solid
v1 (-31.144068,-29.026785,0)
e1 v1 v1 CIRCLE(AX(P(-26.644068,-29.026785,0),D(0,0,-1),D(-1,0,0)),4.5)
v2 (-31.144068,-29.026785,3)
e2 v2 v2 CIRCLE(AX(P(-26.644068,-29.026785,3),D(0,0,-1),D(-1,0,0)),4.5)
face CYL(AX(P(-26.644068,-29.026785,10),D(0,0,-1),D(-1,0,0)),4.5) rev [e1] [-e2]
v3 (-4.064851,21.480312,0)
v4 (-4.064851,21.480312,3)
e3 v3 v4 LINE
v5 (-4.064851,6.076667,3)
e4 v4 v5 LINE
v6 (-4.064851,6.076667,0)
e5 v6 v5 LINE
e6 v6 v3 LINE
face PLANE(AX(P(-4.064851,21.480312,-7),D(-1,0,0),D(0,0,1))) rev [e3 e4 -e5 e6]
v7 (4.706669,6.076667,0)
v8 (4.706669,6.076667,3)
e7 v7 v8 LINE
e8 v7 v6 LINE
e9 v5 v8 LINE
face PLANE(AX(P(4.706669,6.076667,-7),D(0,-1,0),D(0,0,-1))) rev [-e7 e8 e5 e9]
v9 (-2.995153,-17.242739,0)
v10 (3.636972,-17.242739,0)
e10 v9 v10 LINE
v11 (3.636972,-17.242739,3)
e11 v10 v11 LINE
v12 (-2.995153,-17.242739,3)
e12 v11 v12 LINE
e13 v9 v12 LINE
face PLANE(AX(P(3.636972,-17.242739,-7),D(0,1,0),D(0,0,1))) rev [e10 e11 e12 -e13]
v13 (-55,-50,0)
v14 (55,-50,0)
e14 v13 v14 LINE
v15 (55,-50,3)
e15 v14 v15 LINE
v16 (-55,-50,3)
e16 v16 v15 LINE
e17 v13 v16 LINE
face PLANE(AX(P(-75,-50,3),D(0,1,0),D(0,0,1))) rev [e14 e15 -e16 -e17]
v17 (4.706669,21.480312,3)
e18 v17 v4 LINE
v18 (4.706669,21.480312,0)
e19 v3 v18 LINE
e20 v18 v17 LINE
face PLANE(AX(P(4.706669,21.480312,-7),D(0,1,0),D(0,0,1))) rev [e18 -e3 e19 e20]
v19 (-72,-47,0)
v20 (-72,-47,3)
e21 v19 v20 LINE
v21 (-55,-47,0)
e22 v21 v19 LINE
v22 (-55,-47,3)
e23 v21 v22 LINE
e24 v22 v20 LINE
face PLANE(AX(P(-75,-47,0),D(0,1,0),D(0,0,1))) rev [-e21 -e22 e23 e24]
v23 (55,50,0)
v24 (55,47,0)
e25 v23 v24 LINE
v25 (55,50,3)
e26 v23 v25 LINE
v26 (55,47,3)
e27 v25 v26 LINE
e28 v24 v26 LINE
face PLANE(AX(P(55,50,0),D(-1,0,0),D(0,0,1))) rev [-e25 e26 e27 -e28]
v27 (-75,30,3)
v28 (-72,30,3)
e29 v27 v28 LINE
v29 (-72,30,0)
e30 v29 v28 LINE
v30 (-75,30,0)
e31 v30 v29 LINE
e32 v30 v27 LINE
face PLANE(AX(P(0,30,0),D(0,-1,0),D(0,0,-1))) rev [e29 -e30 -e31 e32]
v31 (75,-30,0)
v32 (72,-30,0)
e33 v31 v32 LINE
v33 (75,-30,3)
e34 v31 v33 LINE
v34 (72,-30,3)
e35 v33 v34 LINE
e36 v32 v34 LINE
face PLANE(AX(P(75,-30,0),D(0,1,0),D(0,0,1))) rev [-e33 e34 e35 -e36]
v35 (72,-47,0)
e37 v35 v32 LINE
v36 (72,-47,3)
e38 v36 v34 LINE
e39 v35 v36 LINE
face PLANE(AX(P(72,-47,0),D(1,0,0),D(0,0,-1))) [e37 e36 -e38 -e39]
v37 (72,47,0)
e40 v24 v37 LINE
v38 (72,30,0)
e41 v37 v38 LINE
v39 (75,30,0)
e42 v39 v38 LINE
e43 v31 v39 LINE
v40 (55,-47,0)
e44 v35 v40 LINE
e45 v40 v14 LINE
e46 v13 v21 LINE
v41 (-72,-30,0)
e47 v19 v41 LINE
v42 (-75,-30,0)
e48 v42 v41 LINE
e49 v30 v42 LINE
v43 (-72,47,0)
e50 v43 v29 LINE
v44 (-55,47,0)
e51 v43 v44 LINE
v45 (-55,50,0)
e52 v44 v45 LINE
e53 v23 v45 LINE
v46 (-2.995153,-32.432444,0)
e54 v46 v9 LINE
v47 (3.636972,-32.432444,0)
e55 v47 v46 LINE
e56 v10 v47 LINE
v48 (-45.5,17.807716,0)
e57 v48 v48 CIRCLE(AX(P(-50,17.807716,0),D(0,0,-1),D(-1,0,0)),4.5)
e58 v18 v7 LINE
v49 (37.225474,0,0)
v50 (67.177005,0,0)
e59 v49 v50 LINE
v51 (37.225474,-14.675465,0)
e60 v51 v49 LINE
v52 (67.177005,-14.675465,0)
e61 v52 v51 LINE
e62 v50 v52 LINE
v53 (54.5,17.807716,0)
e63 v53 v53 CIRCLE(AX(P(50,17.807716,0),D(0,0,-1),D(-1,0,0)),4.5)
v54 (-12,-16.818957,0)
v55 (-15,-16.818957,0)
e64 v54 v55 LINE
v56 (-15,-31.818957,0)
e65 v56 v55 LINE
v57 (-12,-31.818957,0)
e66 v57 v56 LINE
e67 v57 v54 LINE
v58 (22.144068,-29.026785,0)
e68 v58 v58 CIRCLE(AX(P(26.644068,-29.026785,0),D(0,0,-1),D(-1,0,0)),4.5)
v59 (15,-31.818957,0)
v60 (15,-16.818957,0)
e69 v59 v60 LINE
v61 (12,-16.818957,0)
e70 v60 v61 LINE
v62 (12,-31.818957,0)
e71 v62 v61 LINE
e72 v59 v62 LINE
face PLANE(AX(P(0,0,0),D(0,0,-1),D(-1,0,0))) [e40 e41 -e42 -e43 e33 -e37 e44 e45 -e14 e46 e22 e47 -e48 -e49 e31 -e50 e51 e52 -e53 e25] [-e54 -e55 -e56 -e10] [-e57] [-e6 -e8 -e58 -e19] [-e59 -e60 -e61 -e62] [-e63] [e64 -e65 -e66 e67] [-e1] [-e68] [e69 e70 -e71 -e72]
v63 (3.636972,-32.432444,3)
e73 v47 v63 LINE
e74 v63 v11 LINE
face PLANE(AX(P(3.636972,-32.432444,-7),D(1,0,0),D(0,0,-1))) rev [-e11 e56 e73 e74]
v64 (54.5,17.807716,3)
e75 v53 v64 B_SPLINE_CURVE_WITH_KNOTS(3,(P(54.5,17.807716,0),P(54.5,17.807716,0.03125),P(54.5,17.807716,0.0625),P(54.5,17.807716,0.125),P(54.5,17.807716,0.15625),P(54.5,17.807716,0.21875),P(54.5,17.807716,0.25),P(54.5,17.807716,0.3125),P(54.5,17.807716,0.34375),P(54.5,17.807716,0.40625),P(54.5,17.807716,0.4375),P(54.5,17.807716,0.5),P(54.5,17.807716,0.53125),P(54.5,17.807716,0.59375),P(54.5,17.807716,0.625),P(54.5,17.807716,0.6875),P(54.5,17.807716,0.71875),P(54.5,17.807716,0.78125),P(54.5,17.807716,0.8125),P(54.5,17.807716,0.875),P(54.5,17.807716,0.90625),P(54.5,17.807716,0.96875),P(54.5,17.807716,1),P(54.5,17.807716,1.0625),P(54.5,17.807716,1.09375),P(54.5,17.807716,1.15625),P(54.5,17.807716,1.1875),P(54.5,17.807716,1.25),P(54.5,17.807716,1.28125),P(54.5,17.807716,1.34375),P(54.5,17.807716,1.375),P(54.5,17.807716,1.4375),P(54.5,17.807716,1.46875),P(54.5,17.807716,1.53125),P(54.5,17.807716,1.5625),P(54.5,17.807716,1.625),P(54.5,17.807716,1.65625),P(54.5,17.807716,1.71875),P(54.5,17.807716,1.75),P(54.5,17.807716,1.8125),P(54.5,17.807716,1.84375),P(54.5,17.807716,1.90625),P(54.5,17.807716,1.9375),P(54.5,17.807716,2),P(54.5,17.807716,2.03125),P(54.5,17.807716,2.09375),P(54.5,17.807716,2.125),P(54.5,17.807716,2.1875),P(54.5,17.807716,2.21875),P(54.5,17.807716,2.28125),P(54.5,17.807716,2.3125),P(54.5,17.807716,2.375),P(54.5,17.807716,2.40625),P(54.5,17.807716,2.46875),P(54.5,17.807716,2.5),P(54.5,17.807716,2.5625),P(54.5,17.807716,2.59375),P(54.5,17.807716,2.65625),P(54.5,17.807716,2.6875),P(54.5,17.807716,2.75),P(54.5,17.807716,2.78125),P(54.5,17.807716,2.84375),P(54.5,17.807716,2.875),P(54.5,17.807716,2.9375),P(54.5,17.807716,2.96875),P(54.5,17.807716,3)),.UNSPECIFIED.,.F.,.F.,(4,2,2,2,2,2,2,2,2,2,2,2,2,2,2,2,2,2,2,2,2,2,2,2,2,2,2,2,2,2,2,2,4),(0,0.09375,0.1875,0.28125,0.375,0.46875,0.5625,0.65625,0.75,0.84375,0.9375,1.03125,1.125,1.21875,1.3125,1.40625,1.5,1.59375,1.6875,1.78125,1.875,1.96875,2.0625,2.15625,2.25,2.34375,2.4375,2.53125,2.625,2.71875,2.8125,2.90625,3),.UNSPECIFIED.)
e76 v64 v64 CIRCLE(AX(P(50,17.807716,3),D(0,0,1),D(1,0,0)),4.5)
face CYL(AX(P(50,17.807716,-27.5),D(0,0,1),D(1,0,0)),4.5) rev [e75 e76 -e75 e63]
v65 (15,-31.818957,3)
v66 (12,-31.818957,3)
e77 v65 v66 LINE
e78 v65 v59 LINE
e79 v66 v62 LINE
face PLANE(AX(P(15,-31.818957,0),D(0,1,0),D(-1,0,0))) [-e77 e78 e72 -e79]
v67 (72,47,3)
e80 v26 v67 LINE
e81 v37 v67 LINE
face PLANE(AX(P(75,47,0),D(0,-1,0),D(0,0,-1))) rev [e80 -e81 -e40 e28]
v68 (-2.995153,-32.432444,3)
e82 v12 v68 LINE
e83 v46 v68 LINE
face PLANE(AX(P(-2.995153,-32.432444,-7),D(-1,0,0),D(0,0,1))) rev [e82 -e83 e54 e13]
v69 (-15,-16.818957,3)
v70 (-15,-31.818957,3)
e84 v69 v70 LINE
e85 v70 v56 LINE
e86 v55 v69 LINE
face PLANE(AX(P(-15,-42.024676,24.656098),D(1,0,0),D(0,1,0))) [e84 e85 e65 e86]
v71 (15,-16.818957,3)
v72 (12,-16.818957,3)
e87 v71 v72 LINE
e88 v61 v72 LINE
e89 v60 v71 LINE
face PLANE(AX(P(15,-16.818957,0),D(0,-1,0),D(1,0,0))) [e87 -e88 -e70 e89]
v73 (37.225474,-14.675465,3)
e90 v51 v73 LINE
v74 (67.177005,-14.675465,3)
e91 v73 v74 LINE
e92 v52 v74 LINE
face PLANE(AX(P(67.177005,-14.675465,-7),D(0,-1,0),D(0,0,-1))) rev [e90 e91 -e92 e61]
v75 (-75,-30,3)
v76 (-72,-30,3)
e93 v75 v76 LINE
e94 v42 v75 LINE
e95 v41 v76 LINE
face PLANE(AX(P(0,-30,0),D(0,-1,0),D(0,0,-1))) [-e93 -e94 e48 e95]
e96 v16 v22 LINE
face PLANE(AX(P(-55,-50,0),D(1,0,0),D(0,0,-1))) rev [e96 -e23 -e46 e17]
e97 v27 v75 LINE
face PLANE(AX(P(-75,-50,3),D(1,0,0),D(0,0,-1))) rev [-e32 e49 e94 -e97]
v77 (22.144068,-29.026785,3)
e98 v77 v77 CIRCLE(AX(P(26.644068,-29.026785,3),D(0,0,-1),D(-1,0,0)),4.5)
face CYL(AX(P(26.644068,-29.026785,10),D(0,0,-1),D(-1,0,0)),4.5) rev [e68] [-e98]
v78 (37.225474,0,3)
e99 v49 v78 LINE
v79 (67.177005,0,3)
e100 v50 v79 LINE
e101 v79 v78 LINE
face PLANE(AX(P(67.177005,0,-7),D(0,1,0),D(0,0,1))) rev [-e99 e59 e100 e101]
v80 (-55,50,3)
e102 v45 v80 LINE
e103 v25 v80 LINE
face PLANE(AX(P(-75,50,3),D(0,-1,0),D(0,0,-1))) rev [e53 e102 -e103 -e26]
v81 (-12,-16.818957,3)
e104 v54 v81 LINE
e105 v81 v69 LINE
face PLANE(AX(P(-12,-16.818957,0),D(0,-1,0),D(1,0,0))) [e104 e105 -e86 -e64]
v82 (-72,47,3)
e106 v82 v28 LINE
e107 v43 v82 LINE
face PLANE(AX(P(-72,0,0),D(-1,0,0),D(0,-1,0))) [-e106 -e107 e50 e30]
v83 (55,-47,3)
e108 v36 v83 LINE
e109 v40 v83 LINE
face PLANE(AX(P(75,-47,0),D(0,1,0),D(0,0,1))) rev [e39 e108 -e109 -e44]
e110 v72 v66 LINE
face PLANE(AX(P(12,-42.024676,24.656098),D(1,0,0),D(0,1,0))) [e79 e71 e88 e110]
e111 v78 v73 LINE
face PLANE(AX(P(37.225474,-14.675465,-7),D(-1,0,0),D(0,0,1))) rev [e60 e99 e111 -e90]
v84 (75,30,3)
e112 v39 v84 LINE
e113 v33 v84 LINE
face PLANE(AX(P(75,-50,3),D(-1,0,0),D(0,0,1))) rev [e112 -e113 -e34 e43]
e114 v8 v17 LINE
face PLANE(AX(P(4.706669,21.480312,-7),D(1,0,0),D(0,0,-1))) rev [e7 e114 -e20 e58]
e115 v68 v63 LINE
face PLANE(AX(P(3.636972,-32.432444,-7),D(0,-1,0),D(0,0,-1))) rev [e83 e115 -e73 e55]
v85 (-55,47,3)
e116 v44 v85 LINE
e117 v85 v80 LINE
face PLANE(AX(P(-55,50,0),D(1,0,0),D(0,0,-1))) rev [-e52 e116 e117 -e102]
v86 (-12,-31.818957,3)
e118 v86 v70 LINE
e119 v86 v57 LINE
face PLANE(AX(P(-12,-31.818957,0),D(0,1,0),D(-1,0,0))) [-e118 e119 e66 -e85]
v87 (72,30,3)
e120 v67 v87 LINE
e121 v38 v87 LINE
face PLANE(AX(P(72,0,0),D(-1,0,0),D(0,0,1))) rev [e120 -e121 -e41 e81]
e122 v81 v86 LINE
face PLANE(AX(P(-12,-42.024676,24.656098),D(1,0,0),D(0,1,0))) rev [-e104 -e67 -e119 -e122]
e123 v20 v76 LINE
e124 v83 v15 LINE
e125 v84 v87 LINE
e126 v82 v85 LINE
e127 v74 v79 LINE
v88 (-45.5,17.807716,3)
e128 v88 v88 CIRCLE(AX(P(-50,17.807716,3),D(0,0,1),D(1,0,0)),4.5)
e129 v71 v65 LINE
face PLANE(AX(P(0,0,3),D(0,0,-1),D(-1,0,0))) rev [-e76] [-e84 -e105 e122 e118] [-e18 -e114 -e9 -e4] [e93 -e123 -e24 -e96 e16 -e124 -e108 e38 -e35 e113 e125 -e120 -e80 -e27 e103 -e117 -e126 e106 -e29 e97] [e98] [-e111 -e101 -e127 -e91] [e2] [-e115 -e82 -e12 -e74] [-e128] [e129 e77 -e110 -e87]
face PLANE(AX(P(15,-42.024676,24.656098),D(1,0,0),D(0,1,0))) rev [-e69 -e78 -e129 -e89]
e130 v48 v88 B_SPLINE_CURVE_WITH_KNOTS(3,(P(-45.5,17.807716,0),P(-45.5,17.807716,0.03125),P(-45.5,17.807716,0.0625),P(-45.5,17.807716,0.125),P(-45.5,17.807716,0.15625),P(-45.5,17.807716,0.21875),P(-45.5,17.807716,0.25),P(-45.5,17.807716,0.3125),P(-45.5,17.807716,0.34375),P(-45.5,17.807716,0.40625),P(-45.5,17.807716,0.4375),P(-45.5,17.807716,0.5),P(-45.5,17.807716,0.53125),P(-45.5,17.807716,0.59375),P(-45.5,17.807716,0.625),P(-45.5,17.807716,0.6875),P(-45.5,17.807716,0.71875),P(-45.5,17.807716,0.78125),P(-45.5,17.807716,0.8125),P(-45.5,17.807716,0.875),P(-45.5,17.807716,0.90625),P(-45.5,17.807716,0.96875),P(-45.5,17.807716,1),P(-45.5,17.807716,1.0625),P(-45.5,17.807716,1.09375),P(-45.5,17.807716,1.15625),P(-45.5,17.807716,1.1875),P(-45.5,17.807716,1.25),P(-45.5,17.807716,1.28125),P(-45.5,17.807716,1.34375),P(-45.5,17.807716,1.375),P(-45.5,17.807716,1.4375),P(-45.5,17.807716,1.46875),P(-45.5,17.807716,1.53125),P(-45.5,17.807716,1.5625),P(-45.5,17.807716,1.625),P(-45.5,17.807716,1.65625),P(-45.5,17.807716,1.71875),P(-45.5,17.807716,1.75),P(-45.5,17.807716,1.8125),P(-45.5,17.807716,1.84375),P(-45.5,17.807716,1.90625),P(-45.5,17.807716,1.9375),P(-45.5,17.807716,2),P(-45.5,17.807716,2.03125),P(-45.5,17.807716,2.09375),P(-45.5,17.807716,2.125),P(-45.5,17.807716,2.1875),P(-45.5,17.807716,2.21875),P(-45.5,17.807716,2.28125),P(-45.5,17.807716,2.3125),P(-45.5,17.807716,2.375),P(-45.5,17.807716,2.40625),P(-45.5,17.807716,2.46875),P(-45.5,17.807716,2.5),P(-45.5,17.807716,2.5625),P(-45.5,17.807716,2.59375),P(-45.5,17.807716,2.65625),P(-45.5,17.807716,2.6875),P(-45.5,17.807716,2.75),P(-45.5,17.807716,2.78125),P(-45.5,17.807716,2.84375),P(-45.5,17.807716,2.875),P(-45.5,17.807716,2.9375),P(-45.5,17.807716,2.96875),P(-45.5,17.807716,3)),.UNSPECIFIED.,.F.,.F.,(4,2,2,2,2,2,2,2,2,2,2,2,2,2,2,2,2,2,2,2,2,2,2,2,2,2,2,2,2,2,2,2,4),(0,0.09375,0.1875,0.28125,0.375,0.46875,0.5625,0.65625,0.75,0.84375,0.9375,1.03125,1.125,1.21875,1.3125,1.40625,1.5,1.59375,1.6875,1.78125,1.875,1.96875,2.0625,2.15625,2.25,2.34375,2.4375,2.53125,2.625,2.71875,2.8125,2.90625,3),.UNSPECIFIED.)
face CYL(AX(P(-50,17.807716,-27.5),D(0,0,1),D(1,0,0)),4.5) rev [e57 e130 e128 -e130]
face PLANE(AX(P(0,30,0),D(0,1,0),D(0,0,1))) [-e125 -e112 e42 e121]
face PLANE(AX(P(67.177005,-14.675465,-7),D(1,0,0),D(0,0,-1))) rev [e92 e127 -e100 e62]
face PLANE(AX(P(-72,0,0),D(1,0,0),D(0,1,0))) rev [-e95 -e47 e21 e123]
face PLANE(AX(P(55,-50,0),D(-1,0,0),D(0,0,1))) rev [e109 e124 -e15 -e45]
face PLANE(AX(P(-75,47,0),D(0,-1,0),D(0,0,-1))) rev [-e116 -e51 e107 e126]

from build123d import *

# Parameters (mm, degrees)
SKETCH1_W           = 150
SKETCH1_H           = 100
BOSS_EXTRUDE1_DEPTH = 3
SKETCH2_W           = 20
SKETCH2_H           = 3
CUT_EXTRUDE1_DEPTH  = 3
SKETCH3_W           = 3
SKETCH3_H           = 17
CUT_EXTRUDE2_DEPTH  = 3
SKETCH5_R           = 4.5
CUT_EXTRUDE4_DEPTH  = 30.5
SKETCH6_R           = 4.5
CUT_EXTRUDE5_DEPTH  = 10
SKETCH7_R           = 1
CUT_EXTRUDE6_DEPTH  = 10
SKETCH9_W           = 29.951530893
SKETCH9_H           = 14.675464834
CUT_EXTRUDE7_DEPTH  = 10
SKETCH10_W          = 6.632124697
SKETCH10_H          = 15.189704953
CUT_EXTRUDE8_DEPTH  = 10
CAVITY1_START       = -15
CAVITY1_OUTLINE_W   = 15
CAVITY1_OUTLINE_H   = 3
CAVITY1_DEPTH       = 3
CAVITY1_START_2     = 12
CAVITY1_2_OUTLINE_W = 15
CAVITY1_2_OUTLINE_H = 3
CAVITY1_2_DEPTH     = 3
SKETCH11_W          = 8.771519761
SKETCH11_H          = 15.403644459
CUT_EXTRUDE9_DEPTH  = 10


# Read off the part's stored shape, not the designer's step: Cavity1
with BuildPart() as part:
    # Sketch1 → Boss-Extrude1 (new body)
    with BuildSketch(Plane.XY):
        Rectangle(SKETCH1_W, SKETCH1_H)
    extrude(amount=BOSS_EXTRUDE1_DEPTH)

    # Sketch2 → Cut-Extrude1 (cut)
    with BuildSketch(Plane.XY.offset(3)):
        with Locations((65, 48.5)):
            Rectangle(SKETCH2_W, SKETCH2_H)
        with Locations((-65, 48.5)):
            Rectangle(SKETCH2_W, SKETCH2_H)
        with Locations((-65, -48.5)):
            Rectangle(SKETCH2_W, SKETCH2_H)
        with Locations((65, -48.5)):
            Rectangle(SKETCH2_W, SKETCH2_H)
    extrude(amount=-CUT_EXTRUDE1_DEPTH, mode=Mode.SUBTRACT)

    # Sketch3 → Cut-Extrude2 (cut)
    with BuildSketch(Plane.XY.offset(3)):
        with Locations((-73.5, 38.5)):
            Rectangle(SKETCH3_W, SKETCH3_H)
        with Locations((-73.5, -38.5)):
            Rectangle(SKETCH3_W, SKETCH3_H)
        with Locations((73.5, 38.5)):
            Rectangle(SKETCH3_W, SKETCH3_H)
        with Locations((73.5, -38.5)):
            Rectangle(SKETCH3_W, SKETCH3_H)
    extrude(amount=-CUT_EXTRUDE2_DEPTH, mode=Mode.SUBTRACT)

    # Sketch5 → Cut-Extrude4 (cut)
    with BuildSketch(Plane.XY.offset(3)):
        with Locations((50, 17.807715926)):
            Circle(SKETCH5_R)
        with Locations((-50, 17.807715926)):
            Circle(SKETCH5_R)
    extrude(amount=-CUT_EXTRUDE4_DEPTH, mode=Mode.SUBTRACT)

    # Sketch6 → Cut-Extrude5 (cut)
    with BuildSketch(Plane(origin=(0, 0, 0), x_dir=(-1, 0, 0), z_dir=(0, 0, -1))):
        with Locations((26.644067797, -29.026784983)):
            Circle(SKETCH6_R)
        with Locations((-26.644067797, -29.026784983)):
            Circle(SKETCH6_R)
    extrude(amount=-CUT_EXTRUDE5_DEPTH, mode=Mode.SUBTRACT)

    # Sketch7 → Cut-Extrude6 (cut)
    with BuildSketch(Plane.XY.offset(3)):
        with Locations((0, 18.473215017)):
            Circle(SKETCH7_R)
        with Locations((0, -29.026784983)):
            Circle(SKETCH7_R)
    extrude(amount=-CUT_EXTRUDE6_DEPTH, mode=Mode.SUBTRACT)

    # Sketch9 → Cut-Extrude7 (cut)
    with BuildSketch(Plane.XY.offset(3)):
        with Locations((52.201239556, -7.337732417)):
            Rectangle(SKETCH9_W, SKETCH9_H)
    extrude(amount=-CUT_EXTRUDE7_DEPTH, mode=Mode.SUBTRACT)

    # Sketch10 → Cut-Extrude8 (cut)
    with BuildSketch(Plane.XY.offset(3)):
        with Locations((0.32090926, -24.837591387)):
            Rectangle(SKETCH10_W, SKETCH10_H)
    extrude(amount=-CUT_EXTRUDE8_DEPTH, mode=Mode.SUBTRACT)

    # Cavity1 outline → Cavity1 (cut)
    with BuildSketch(Plane.YZ.offset(CAVITY1_START)):
        with Locations((-24.318956618, 1.5)):
            Rectangle(CAVITY1_OUTLINE_W, CAVITY1_OUTLINE_H)
    extrude(amount=CAVITY1_DEPTH, mode=Mode.SUBTRACT)

    # Cavity1 2 outline → Cavity1 2 (cut)
    with BuildSketch(Plane.YZ.offset(CAVITY1_START_2)):
        with Locations((-24.318956618, 1.5)):
            Rectangle(CAVITY1_2_OUTLINE_W, CAVITY1_2_OUTLINE_H)
    extrude(amount=CAVITY1_2_DEPTH, mode=Mode.SUBTRACT)

    # Sketch11 → Cut-Extrude9 (cut)
    with BuildSketch(Plane.XY.offset(3)):
        with Locations((0.32090926, 13.778489515)):
            Rectangle(SKETCH11_W, SKETCH11_H)
    extrude(amount=-CUT_EXTRUDE9_DEPTH, mode=Mode.SUBTRACT)


solid = part.part
